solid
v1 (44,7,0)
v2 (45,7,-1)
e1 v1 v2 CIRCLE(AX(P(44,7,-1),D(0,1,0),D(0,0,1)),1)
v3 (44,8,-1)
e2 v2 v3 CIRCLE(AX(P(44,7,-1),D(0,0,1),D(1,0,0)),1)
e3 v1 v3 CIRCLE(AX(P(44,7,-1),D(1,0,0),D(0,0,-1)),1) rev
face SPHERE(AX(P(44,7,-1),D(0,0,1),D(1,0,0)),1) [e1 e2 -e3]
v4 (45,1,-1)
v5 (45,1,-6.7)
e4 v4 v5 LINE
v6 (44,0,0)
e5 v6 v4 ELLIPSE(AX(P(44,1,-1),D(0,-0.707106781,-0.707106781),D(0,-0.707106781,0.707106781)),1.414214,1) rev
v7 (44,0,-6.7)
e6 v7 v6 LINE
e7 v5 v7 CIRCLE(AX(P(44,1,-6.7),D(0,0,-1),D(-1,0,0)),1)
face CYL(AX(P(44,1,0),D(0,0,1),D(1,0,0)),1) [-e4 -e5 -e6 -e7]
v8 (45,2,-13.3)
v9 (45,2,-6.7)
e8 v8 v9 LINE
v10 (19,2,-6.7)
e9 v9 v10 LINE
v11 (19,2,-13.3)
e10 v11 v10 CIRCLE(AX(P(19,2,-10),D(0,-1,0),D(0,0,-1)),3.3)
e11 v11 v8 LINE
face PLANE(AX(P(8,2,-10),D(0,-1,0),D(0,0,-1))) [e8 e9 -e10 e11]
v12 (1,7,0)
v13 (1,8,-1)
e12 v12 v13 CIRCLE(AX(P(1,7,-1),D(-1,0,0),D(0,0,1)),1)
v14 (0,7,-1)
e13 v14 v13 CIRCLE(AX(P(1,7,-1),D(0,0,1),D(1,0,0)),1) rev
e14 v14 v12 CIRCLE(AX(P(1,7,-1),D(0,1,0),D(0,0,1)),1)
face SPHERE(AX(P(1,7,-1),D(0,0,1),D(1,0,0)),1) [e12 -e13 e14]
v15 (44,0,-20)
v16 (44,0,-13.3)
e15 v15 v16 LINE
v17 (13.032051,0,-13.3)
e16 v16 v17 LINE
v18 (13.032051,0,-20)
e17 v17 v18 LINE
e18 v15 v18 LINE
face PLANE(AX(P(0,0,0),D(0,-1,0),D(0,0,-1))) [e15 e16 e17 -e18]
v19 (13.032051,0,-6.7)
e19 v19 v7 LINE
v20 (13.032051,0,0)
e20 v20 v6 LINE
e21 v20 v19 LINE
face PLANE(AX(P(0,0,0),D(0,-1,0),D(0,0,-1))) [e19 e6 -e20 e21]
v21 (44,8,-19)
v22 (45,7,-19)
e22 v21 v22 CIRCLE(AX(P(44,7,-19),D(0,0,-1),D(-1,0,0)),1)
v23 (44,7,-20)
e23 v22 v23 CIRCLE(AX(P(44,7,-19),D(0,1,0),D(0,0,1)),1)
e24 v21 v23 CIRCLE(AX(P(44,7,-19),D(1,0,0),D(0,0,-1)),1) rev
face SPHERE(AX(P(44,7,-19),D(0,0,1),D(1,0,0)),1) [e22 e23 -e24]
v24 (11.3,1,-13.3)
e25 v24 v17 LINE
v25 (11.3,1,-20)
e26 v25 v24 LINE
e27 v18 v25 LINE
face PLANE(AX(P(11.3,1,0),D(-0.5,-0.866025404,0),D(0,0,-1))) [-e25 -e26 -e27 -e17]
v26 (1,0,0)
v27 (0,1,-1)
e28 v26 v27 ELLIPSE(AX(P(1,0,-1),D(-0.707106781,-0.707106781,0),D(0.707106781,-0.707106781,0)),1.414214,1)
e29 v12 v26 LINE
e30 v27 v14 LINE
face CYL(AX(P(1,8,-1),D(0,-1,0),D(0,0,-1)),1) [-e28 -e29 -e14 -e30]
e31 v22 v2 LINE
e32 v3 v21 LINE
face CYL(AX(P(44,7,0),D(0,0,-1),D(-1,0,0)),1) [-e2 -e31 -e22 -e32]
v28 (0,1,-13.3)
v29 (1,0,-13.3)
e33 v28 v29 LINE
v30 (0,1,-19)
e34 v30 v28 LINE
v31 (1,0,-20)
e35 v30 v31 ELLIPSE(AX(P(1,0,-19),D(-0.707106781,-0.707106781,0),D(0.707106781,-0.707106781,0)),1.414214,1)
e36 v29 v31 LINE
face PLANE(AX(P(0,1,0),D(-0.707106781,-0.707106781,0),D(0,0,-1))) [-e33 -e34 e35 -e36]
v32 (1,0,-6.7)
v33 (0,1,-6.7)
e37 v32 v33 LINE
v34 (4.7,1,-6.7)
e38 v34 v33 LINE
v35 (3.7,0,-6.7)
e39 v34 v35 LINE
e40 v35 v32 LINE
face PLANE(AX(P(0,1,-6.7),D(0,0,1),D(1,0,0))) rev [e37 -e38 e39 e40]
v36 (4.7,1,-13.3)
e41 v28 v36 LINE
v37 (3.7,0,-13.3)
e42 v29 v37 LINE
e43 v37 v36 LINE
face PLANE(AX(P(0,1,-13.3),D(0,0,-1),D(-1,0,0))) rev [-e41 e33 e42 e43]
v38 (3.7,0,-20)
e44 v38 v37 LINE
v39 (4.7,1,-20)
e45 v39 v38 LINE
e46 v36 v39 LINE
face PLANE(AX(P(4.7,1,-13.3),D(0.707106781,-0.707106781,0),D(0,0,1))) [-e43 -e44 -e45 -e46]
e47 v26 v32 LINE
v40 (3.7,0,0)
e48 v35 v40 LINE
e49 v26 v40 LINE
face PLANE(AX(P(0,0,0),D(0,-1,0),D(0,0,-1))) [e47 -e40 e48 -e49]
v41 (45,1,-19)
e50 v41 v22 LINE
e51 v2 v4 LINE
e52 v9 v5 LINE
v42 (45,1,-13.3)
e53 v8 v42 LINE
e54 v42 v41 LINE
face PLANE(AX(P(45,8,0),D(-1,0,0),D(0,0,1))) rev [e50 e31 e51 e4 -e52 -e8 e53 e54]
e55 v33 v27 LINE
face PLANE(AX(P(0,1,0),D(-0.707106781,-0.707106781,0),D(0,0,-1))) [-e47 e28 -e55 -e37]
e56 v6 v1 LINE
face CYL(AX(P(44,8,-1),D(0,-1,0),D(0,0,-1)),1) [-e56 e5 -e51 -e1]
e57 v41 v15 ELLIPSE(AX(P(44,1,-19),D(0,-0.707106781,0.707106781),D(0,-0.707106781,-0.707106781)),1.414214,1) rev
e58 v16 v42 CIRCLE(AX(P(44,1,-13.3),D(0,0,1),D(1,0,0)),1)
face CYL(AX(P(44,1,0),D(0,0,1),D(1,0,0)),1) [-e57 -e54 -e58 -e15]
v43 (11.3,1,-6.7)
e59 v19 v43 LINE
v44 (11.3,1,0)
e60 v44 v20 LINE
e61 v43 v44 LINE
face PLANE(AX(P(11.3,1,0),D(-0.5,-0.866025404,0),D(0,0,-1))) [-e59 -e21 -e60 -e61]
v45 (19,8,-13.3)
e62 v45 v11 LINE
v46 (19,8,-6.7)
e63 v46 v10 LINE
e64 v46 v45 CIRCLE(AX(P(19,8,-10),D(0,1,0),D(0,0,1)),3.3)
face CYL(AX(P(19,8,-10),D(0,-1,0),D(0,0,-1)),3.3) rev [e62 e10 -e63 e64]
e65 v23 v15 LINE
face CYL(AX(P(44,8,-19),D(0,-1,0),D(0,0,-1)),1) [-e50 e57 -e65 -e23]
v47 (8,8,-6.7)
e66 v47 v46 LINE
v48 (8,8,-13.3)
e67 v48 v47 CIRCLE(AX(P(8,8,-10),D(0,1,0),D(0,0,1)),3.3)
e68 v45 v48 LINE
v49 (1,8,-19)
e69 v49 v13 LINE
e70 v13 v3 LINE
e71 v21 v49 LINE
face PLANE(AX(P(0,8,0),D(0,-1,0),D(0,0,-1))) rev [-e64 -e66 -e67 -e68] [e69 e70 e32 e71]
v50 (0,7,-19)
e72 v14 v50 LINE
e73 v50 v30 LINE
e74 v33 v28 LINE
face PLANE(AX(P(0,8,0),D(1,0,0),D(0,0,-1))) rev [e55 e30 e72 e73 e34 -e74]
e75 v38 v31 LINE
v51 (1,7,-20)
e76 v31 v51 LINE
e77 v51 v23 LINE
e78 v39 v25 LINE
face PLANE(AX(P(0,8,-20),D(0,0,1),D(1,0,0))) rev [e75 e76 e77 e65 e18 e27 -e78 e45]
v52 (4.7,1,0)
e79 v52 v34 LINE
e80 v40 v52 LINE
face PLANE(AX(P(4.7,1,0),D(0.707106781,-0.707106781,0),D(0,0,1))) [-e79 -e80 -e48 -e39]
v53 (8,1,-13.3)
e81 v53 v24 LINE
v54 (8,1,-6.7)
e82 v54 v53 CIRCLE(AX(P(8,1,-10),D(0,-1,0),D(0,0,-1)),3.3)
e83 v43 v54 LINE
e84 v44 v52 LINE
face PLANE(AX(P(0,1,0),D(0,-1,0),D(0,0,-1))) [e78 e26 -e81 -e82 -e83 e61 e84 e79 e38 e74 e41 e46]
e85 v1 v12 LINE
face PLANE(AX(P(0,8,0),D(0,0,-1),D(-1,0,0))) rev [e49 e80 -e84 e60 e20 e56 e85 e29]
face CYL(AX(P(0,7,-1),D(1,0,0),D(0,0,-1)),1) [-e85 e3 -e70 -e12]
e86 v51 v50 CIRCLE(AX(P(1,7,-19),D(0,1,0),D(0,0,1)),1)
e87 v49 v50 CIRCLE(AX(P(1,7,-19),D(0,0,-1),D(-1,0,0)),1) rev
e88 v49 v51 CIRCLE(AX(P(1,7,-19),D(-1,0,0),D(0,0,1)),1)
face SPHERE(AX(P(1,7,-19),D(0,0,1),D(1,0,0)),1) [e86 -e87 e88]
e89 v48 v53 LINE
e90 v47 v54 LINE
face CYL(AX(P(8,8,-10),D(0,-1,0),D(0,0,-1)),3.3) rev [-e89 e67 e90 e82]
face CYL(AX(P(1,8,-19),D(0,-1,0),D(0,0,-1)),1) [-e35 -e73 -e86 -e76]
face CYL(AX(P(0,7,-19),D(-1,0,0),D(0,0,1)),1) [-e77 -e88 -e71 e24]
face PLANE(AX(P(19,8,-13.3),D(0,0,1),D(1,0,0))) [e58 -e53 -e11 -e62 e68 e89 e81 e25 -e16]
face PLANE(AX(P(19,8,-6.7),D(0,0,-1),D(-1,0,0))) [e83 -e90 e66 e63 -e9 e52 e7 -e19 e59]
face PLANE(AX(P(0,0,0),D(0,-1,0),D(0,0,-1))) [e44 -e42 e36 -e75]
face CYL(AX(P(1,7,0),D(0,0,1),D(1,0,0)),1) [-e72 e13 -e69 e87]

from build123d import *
from OCP.BRepFilletAPI import BRepFilletAPI_MakeChamfer

# Parameters (mm, degrees)
SKETCH_1_W          = 45
SKETCH_1_H          = 20
EXTRUDE_1_DEPTH     = 8
CUT_EXTRUDE_1_DEPTH = 2
CUT_EXTRUDE_2_DEPTH = 1
CHAMFER_1_SIZE      = 1
CHAMFER_2_SIZE      = 1
CHAMFER_2_SIZE_2    = 1.732050808
FILLET_1_R          = 1


with BuildPart() as part:
    # 草图1 → 凸台-拉伸1 (new body)
    with BuildSketch(Plane(origin=(0, 0, 0), x_dir=(1, 0, 0), z_dir=(0, 1, 0))):
        with Locations((22.5, 10)):
            Rectangle(SKETCH_1_W, SKETCH_1_H)
        with BuildLine():
            Line((19, 6.7), (8, 6.7))
            ThreePointArc((8, 6.7), (4.7, 10), (8, 13.3))
            Line((8, 13.3), (19, 13.3))
            ThreePointArc((19, 13.3), (22.3, 10), (19, 6.7))
        make_face(mode=Mode.SUBTRACT)
    extrude(amount=EXTRUDE_1_DEPTH)

    # 草图2 → 切除-拉伸1 (cut)
    with BuildSketch(Plane.XZ):
        with BuildLine():
            Line((45, -6.7), (45, -13.3))
            Line((45, -13.3), (8, -13.3))
            ThreePointArc((8, -13.3), (4.7, -10), (8, -6.7))
            Line((8, -6.7), (45, -6.7))
        make_face()
    extrude(amount=-CUT_EXTRUDE_1_DEPTH, mode=Mode.SUBTRACT)

    # 草图3 → 切除-拉伸2 (cut)
    with BuildSketch(Plane.XZ):
        Polygon((0, -6.7), (4.7, -6.7), (4.7, 0), (11.3, 0), (11.3, -20), (4.7, -20), (4.7, -13.3), (0, -13.3), align=None)
    extrude(amount=-CUT_EXTRUDE_2_DEPTH, mode=Mode.SUBTRACT)

    # 倒角1
    chamfer_1_edges = [part.edges().sort_by_distance(p)[0] for p in [
        (0, 0, -16.65),
        (4.7, 0, -16.65),
        (4.7, 0, -3.35),
        (0, 0, -3.35),
    ]]
    chamfer(chamfer_1_edges, length=CHAMFER_1_SIZE - 0.0001)  # a hair under: the kernel refuses the full size

    # 倒角2
    chamfer_2_edges_1 = [part.edges().sort_by_distance(p)[0] for p in [
        (11.3, 0, -16.65),
    ]]
    chamfer_2_side_1 = [part.faces().sort_by_distance(p)[0] for p in [
        (11.3, 0.02, -16.65),
    ]]
    chamfer_2_edges_2 = [part.edges().sort_by_distance(p)[0] for p in [
        (11.3, 0, -3.35),
    ]]
    chamfer_2_side_2 = [part.faces().sort_by_distance(p)[0] for p in [
        (11.3, 0.02, -3.35),
    ]]
    chamfer_2 = BRepFilletAPI_MakeChamfer(part.part.solid().wrapped)
    for e in chamfer_2_edges_1:
        chamfer_2.Add(CHAMFER_2_SIZE - 0.0001, CHAMFER_2_SIZE_2 - 0.0001, e.wrapped, chamfer_2_side_1[0].wrapped)
    for e in chamfer_2_edges_2:
        chamfer_2.Add(CHAMFER_2_SIZE - 0.0001, CHAMFER_2_SIZE_2 - 0.0001, e.wrapped, chamfer_2_side_2[0].wrapped)
    add(Compound.cast(chamfer_2.Shape()), mode=Mode.REPLACE)  # a hair under: the kernel refuses the full size

    # 圆角1
    fillet_1_edges = [part.edges().sort_by_distance(p)[0] for p in [
        (22.5, 8, -20),
        (45, 8, -10),
        (22.5, 8, 0),
        (0, 8, -10),
        (45, 4, 0),
        (45, 4, -20),
        (0, 4.49995, -20),
        (0, 4.49995, 0),
        (45, 0, -16.65),
        (45, 0, -3.35),
    ]]
    fillet(fillet_1_edges, radius=FILLET_1_R)


solid = part.part
